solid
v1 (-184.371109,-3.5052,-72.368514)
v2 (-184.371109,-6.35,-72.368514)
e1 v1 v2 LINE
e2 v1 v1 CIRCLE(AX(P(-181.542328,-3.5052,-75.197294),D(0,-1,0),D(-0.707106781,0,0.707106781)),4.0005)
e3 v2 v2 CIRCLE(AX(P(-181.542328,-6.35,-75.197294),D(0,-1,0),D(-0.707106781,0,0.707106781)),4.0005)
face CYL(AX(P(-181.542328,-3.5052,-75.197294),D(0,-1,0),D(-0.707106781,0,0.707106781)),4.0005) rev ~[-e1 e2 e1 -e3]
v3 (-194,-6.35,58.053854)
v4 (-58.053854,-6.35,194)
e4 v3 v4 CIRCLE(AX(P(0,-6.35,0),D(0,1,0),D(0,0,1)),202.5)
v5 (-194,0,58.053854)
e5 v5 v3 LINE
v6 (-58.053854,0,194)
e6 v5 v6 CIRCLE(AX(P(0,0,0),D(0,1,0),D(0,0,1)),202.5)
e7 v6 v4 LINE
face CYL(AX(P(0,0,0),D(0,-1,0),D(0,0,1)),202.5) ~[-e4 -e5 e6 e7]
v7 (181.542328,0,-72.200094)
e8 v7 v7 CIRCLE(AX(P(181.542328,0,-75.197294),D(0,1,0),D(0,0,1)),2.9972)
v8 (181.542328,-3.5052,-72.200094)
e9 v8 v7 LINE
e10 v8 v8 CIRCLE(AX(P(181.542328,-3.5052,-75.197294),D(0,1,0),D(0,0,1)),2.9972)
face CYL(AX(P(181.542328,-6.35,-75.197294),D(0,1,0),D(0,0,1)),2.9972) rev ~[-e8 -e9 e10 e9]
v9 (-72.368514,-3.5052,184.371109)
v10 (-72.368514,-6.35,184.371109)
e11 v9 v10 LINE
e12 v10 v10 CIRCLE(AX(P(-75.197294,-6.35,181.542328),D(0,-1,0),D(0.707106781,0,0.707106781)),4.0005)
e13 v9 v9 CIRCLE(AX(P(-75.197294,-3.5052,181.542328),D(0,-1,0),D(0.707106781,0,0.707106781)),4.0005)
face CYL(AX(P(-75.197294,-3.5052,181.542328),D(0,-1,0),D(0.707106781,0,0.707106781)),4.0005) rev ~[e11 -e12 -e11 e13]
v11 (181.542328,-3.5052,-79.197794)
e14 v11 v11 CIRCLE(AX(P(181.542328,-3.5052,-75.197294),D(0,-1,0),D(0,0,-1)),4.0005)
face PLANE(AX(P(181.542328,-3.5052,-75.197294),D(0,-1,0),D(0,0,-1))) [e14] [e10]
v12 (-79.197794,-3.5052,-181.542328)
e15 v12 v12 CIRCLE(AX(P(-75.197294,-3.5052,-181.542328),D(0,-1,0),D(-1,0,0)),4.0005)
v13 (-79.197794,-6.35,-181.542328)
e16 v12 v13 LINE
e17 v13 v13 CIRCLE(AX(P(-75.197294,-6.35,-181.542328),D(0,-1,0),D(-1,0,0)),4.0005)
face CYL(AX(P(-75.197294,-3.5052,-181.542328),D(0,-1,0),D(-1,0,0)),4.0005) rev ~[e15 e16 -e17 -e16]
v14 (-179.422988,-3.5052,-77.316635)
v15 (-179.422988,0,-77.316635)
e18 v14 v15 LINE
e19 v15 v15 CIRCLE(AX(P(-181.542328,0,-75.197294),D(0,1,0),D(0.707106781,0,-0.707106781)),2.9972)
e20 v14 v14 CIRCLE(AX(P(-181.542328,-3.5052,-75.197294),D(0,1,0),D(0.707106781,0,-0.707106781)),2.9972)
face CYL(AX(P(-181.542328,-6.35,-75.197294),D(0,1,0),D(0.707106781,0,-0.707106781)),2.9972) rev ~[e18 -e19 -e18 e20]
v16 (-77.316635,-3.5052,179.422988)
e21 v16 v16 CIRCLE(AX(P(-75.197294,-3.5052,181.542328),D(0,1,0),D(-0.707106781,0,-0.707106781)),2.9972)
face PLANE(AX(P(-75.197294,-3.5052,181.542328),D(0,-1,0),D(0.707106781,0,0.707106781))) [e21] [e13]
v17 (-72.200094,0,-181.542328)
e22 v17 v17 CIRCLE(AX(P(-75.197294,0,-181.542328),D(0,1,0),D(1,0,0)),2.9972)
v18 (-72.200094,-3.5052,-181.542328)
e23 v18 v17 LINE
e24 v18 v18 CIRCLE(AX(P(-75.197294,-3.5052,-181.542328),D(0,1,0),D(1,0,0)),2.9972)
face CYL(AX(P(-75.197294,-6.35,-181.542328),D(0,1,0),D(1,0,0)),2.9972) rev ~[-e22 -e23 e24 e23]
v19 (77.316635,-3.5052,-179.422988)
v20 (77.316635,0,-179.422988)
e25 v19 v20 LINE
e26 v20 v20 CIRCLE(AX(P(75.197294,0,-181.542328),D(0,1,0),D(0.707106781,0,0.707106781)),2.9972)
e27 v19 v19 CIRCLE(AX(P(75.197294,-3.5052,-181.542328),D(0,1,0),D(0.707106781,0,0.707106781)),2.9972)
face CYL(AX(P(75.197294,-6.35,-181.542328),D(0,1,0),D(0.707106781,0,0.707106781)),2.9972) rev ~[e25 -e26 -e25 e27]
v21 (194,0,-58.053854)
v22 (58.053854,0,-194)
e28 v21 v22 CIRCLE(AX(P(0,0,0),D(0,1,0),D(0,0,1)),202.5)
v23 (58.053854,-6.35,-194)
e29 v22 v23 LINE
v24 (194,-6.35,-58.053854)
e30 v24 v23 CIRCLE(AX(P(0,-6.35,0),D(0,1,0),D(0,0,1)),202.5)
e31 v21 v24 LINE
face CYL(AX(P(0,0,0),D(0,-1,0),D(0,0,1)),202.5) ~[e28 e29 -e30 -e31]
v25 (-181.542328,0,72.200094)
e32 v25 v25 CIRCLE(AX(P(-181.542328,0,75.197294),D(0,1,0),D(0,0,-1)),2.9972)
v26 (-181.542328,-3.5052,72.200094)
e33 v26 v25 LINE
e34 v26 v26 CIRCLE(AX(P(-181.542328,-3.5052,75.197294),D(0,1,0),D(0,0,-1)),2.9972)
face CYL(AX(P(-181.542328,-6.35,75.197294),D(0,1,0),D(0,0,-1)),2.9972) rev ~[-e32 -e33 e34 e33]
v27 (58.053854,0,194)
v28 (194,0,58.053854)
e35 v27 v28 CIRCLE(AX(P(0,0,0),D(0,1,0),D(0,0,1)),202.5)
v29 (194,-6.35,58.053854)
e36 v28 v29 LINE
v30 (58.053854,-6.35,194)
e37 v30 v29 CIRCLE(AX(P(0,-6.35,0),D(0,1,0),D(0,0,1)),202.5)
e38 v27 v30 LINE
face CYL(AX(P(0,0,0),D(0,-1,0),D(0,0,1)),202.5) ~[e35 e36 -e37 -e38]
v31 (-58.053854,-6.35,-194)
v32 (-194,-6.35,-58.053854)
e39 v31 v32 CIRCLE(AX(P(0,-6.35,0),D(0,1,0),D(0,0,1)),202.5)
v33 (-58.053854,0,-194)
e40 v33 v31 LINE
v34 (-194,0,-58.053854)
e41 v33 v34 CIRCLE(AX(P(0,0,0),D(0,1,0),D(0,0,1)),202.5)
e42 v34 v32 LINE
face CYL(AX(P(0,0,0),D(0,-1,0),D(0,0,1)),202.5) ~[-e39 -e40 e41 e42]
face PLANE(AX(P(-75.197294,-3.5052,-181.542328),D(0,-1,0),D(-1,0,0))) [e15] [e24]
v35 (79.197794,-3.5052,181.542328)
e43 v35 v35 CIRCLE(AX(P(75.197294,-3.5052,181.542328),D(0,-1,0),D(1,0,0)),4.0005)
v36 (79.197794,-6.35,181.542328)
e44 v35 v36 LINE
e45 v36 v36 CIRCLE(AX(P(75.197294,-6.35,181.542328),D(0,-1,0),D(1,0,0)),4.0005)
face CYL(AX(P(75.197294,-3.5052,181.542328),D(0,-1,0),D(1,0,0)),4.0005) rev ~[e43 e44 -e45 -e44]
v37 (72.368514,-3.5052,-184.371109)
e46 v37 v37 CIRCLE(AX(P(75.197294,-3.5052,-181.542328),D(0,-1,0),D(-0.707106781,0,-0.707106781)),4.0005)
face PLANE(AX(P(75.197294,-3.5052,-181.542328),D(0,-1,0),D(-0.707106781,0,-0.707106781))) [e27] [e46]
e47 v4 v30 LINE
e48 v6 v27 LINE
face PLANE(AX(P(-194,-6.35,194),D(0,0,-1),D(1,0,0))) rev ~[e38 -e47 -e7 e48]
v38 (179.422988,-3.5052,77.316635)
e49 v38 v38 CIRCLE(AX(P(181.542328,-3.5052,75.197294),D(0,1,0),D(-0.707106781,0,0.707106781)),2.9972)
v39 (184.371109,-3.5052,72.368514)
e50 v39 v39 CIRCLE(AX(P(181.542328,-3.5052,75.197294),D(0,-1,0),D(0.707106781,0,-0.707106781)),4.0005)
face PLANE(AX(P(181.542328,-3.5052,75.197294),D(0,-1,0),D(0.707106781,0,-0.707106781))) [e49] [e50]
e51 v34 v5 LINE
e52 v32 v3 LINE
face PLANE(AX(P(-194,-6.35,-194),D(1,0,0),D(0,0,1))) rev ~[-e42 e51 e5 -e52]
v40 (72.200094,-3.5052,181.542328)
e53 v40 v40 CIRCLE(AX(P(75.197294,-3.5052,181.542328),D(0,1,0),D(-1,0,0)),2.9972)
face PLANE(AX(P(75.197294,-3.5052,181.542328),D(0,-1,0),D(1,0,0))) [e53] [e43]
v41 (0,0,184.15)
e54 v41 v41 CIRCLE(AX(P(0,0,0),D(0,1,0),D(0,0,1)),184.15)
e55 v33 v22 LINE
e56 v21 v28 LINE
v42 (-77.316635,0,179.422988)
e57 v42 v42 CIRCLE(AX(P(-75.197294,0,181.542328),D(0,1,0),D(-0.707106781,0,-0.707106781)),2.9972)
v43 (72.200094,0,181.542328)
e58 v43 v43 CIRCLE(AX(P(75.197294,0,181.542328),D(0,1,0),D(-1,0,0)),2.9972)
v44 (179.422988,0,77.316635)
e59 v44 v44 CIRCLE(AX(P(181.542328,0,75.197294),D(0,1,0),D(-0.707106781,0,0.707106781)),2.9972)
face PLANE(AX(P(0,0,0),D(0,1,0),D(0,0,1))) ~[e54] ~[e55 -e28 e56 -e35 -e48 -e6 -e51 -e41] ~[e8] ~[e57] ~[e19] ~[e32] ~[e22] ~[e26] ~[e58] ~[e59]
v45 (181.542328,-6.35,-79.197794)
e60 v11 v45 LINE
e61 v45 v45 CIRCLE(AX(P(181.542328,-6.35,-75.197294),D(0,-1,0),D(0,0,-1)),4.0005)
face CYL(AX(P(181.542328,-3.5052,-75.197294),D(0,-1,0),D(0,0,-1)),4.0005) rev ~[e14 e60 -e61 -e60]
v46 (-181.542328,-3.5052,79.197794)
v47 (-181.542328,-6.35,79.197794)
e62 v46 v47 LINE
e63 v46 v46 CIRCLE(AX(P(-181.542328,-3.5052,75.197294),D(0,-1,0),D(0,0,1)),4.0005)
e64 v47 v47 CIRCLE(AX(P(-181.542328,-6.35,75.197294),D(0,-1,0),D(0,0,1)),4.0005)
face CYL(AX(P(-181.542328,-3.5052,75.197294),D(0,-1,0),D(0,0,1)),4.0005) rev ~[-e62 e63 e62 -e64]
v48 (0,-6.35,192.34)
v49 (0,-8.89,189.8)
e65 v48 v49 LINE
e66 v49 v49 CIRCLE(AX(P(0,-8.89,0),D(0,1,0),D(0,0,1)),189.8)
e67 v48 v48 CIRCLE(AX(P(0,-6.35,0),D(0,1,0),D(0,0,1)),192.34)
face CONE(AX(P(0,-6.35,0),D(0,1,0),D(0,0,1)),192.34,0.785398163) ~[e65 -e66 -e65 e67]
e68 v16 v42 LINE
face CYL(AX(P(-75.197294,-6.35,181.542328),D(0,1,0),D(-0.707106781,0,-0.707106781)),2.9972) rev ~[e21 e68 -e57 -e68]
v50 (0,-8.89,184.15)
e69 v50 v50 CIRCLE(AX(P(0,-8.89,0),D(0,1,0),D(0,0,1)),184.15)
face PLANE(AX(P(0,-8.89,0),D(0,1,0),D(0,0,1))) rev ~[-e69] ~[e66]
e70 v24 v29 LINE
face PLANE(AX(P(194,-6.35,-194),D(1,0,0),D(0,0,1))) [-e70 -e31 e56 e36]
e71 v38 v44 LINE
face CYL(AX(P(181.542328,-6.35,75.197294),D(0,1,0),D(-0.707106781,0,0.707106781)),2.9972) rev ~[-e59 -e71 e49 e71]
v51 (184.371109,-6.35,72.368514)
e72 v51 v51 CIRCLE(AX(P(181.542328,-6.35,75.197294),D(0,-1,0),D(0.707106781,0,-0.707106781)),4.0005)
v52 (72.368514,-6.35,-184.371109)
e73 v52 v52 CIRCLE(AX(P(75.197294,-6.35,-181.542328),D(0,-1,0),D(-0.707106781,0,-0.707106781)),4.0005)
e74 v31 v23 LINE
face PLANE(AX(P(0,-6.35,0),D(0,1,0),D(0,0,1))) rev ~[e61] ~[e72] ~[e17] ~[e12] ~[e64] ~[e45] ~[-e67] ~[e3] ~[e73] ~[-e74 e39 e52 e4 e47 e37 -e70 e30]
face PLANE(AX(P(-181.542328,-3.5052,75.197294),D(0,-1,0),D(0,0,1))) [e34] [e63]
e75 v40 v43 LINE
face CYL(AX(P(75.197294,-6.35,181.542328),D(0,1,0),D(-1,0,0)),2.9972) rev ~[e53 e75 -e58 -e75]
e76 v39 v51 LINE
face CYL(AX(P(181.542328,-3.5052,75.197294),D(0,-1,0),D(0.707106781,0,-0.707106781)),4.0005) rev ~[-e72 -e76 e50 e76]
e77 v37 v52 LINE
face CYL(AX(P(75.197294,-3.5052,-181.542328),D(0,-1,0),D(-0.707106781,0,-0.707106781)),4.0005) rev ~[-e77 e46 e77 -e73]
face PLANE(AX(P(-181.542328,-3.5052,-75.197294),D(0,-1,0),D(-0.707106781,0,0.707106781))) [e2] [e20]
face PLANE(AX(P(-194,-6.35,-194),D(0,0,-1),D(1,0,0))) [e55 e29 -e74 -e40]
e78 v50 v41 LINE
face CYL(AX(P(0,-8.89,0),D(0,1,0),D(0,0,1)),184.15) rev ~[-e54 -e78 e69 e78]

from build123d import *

# Parameters (mm, degrees)
F3_D            = 5.9944
F3_DEPTH        = 25.4
F3_CBORE_D      = 8.001
F3_CBORE_DEPTH  = 2.8448
F3_TIP          = 1.8008994473
F3_COPIES_COUNT = 8
F4_R            = 365.4109378698
F4_W            = 388
F4_H            = 388
F5_DEPTH        = 6.351


# Not quite as in the source:
# - a pattern or mirror of a feature is missing from the dataset's text; its kind, count and spacing are read off the source's solid


with BuildPart() as f1:
    # F0 (on Right) → F1 (revolve)
    with BuildSketch(Plane.YZ):
        Polygon((-8.89, 184.15), (0, 184.15), (0, 202.5), (-6.35, 202.5), (-6.35, 192.34), (-8.89, 189.8), align=None)
    revolve(axis=Axis((0, 77.3353951023, 0), (0, 1, 0)))

    # F3
    with Locations(Plane.XZ.offset(6.35)):
        with Locations((75.1972944597, 181.5423281385)):
            f3 = CounterBoreHole(F3_D / 2, F3_CBORE_D / 2, F3_CBORE_DEPTH, depth=F3_DEPTH)
            with Locations((0, 0, -(F3_DEPTH + F3_TIP / 2))):  # 118° drill point
                Cone(0, F3_D / 2, F3_TIP, mode=Mode.SUBTRACT)

    # F3_copies: F3 ×8 about axis
    f3_copies_axis = Axis((0, 0, 0), (0, 1, 0))
    for i in range(1, F3_COPIES_COUNT):
        add(f3.rotate(f3_copies_axis, i * 360 / F3_COPIES_COUNT), mode=Mode.SUBTRACT)

    # F4 (on face) → F5 (cut, through all)
    with BuildSketch(Plane.XZ.offset(6.35)):
        Circle(F4_R)
        Rectangle(F4_W, F4_H, mode=Mode.SUBTRACT)
    extrude(amount=-F5_DEPTH, mode=Mode.SUBTRACT)


solid = f1.part
